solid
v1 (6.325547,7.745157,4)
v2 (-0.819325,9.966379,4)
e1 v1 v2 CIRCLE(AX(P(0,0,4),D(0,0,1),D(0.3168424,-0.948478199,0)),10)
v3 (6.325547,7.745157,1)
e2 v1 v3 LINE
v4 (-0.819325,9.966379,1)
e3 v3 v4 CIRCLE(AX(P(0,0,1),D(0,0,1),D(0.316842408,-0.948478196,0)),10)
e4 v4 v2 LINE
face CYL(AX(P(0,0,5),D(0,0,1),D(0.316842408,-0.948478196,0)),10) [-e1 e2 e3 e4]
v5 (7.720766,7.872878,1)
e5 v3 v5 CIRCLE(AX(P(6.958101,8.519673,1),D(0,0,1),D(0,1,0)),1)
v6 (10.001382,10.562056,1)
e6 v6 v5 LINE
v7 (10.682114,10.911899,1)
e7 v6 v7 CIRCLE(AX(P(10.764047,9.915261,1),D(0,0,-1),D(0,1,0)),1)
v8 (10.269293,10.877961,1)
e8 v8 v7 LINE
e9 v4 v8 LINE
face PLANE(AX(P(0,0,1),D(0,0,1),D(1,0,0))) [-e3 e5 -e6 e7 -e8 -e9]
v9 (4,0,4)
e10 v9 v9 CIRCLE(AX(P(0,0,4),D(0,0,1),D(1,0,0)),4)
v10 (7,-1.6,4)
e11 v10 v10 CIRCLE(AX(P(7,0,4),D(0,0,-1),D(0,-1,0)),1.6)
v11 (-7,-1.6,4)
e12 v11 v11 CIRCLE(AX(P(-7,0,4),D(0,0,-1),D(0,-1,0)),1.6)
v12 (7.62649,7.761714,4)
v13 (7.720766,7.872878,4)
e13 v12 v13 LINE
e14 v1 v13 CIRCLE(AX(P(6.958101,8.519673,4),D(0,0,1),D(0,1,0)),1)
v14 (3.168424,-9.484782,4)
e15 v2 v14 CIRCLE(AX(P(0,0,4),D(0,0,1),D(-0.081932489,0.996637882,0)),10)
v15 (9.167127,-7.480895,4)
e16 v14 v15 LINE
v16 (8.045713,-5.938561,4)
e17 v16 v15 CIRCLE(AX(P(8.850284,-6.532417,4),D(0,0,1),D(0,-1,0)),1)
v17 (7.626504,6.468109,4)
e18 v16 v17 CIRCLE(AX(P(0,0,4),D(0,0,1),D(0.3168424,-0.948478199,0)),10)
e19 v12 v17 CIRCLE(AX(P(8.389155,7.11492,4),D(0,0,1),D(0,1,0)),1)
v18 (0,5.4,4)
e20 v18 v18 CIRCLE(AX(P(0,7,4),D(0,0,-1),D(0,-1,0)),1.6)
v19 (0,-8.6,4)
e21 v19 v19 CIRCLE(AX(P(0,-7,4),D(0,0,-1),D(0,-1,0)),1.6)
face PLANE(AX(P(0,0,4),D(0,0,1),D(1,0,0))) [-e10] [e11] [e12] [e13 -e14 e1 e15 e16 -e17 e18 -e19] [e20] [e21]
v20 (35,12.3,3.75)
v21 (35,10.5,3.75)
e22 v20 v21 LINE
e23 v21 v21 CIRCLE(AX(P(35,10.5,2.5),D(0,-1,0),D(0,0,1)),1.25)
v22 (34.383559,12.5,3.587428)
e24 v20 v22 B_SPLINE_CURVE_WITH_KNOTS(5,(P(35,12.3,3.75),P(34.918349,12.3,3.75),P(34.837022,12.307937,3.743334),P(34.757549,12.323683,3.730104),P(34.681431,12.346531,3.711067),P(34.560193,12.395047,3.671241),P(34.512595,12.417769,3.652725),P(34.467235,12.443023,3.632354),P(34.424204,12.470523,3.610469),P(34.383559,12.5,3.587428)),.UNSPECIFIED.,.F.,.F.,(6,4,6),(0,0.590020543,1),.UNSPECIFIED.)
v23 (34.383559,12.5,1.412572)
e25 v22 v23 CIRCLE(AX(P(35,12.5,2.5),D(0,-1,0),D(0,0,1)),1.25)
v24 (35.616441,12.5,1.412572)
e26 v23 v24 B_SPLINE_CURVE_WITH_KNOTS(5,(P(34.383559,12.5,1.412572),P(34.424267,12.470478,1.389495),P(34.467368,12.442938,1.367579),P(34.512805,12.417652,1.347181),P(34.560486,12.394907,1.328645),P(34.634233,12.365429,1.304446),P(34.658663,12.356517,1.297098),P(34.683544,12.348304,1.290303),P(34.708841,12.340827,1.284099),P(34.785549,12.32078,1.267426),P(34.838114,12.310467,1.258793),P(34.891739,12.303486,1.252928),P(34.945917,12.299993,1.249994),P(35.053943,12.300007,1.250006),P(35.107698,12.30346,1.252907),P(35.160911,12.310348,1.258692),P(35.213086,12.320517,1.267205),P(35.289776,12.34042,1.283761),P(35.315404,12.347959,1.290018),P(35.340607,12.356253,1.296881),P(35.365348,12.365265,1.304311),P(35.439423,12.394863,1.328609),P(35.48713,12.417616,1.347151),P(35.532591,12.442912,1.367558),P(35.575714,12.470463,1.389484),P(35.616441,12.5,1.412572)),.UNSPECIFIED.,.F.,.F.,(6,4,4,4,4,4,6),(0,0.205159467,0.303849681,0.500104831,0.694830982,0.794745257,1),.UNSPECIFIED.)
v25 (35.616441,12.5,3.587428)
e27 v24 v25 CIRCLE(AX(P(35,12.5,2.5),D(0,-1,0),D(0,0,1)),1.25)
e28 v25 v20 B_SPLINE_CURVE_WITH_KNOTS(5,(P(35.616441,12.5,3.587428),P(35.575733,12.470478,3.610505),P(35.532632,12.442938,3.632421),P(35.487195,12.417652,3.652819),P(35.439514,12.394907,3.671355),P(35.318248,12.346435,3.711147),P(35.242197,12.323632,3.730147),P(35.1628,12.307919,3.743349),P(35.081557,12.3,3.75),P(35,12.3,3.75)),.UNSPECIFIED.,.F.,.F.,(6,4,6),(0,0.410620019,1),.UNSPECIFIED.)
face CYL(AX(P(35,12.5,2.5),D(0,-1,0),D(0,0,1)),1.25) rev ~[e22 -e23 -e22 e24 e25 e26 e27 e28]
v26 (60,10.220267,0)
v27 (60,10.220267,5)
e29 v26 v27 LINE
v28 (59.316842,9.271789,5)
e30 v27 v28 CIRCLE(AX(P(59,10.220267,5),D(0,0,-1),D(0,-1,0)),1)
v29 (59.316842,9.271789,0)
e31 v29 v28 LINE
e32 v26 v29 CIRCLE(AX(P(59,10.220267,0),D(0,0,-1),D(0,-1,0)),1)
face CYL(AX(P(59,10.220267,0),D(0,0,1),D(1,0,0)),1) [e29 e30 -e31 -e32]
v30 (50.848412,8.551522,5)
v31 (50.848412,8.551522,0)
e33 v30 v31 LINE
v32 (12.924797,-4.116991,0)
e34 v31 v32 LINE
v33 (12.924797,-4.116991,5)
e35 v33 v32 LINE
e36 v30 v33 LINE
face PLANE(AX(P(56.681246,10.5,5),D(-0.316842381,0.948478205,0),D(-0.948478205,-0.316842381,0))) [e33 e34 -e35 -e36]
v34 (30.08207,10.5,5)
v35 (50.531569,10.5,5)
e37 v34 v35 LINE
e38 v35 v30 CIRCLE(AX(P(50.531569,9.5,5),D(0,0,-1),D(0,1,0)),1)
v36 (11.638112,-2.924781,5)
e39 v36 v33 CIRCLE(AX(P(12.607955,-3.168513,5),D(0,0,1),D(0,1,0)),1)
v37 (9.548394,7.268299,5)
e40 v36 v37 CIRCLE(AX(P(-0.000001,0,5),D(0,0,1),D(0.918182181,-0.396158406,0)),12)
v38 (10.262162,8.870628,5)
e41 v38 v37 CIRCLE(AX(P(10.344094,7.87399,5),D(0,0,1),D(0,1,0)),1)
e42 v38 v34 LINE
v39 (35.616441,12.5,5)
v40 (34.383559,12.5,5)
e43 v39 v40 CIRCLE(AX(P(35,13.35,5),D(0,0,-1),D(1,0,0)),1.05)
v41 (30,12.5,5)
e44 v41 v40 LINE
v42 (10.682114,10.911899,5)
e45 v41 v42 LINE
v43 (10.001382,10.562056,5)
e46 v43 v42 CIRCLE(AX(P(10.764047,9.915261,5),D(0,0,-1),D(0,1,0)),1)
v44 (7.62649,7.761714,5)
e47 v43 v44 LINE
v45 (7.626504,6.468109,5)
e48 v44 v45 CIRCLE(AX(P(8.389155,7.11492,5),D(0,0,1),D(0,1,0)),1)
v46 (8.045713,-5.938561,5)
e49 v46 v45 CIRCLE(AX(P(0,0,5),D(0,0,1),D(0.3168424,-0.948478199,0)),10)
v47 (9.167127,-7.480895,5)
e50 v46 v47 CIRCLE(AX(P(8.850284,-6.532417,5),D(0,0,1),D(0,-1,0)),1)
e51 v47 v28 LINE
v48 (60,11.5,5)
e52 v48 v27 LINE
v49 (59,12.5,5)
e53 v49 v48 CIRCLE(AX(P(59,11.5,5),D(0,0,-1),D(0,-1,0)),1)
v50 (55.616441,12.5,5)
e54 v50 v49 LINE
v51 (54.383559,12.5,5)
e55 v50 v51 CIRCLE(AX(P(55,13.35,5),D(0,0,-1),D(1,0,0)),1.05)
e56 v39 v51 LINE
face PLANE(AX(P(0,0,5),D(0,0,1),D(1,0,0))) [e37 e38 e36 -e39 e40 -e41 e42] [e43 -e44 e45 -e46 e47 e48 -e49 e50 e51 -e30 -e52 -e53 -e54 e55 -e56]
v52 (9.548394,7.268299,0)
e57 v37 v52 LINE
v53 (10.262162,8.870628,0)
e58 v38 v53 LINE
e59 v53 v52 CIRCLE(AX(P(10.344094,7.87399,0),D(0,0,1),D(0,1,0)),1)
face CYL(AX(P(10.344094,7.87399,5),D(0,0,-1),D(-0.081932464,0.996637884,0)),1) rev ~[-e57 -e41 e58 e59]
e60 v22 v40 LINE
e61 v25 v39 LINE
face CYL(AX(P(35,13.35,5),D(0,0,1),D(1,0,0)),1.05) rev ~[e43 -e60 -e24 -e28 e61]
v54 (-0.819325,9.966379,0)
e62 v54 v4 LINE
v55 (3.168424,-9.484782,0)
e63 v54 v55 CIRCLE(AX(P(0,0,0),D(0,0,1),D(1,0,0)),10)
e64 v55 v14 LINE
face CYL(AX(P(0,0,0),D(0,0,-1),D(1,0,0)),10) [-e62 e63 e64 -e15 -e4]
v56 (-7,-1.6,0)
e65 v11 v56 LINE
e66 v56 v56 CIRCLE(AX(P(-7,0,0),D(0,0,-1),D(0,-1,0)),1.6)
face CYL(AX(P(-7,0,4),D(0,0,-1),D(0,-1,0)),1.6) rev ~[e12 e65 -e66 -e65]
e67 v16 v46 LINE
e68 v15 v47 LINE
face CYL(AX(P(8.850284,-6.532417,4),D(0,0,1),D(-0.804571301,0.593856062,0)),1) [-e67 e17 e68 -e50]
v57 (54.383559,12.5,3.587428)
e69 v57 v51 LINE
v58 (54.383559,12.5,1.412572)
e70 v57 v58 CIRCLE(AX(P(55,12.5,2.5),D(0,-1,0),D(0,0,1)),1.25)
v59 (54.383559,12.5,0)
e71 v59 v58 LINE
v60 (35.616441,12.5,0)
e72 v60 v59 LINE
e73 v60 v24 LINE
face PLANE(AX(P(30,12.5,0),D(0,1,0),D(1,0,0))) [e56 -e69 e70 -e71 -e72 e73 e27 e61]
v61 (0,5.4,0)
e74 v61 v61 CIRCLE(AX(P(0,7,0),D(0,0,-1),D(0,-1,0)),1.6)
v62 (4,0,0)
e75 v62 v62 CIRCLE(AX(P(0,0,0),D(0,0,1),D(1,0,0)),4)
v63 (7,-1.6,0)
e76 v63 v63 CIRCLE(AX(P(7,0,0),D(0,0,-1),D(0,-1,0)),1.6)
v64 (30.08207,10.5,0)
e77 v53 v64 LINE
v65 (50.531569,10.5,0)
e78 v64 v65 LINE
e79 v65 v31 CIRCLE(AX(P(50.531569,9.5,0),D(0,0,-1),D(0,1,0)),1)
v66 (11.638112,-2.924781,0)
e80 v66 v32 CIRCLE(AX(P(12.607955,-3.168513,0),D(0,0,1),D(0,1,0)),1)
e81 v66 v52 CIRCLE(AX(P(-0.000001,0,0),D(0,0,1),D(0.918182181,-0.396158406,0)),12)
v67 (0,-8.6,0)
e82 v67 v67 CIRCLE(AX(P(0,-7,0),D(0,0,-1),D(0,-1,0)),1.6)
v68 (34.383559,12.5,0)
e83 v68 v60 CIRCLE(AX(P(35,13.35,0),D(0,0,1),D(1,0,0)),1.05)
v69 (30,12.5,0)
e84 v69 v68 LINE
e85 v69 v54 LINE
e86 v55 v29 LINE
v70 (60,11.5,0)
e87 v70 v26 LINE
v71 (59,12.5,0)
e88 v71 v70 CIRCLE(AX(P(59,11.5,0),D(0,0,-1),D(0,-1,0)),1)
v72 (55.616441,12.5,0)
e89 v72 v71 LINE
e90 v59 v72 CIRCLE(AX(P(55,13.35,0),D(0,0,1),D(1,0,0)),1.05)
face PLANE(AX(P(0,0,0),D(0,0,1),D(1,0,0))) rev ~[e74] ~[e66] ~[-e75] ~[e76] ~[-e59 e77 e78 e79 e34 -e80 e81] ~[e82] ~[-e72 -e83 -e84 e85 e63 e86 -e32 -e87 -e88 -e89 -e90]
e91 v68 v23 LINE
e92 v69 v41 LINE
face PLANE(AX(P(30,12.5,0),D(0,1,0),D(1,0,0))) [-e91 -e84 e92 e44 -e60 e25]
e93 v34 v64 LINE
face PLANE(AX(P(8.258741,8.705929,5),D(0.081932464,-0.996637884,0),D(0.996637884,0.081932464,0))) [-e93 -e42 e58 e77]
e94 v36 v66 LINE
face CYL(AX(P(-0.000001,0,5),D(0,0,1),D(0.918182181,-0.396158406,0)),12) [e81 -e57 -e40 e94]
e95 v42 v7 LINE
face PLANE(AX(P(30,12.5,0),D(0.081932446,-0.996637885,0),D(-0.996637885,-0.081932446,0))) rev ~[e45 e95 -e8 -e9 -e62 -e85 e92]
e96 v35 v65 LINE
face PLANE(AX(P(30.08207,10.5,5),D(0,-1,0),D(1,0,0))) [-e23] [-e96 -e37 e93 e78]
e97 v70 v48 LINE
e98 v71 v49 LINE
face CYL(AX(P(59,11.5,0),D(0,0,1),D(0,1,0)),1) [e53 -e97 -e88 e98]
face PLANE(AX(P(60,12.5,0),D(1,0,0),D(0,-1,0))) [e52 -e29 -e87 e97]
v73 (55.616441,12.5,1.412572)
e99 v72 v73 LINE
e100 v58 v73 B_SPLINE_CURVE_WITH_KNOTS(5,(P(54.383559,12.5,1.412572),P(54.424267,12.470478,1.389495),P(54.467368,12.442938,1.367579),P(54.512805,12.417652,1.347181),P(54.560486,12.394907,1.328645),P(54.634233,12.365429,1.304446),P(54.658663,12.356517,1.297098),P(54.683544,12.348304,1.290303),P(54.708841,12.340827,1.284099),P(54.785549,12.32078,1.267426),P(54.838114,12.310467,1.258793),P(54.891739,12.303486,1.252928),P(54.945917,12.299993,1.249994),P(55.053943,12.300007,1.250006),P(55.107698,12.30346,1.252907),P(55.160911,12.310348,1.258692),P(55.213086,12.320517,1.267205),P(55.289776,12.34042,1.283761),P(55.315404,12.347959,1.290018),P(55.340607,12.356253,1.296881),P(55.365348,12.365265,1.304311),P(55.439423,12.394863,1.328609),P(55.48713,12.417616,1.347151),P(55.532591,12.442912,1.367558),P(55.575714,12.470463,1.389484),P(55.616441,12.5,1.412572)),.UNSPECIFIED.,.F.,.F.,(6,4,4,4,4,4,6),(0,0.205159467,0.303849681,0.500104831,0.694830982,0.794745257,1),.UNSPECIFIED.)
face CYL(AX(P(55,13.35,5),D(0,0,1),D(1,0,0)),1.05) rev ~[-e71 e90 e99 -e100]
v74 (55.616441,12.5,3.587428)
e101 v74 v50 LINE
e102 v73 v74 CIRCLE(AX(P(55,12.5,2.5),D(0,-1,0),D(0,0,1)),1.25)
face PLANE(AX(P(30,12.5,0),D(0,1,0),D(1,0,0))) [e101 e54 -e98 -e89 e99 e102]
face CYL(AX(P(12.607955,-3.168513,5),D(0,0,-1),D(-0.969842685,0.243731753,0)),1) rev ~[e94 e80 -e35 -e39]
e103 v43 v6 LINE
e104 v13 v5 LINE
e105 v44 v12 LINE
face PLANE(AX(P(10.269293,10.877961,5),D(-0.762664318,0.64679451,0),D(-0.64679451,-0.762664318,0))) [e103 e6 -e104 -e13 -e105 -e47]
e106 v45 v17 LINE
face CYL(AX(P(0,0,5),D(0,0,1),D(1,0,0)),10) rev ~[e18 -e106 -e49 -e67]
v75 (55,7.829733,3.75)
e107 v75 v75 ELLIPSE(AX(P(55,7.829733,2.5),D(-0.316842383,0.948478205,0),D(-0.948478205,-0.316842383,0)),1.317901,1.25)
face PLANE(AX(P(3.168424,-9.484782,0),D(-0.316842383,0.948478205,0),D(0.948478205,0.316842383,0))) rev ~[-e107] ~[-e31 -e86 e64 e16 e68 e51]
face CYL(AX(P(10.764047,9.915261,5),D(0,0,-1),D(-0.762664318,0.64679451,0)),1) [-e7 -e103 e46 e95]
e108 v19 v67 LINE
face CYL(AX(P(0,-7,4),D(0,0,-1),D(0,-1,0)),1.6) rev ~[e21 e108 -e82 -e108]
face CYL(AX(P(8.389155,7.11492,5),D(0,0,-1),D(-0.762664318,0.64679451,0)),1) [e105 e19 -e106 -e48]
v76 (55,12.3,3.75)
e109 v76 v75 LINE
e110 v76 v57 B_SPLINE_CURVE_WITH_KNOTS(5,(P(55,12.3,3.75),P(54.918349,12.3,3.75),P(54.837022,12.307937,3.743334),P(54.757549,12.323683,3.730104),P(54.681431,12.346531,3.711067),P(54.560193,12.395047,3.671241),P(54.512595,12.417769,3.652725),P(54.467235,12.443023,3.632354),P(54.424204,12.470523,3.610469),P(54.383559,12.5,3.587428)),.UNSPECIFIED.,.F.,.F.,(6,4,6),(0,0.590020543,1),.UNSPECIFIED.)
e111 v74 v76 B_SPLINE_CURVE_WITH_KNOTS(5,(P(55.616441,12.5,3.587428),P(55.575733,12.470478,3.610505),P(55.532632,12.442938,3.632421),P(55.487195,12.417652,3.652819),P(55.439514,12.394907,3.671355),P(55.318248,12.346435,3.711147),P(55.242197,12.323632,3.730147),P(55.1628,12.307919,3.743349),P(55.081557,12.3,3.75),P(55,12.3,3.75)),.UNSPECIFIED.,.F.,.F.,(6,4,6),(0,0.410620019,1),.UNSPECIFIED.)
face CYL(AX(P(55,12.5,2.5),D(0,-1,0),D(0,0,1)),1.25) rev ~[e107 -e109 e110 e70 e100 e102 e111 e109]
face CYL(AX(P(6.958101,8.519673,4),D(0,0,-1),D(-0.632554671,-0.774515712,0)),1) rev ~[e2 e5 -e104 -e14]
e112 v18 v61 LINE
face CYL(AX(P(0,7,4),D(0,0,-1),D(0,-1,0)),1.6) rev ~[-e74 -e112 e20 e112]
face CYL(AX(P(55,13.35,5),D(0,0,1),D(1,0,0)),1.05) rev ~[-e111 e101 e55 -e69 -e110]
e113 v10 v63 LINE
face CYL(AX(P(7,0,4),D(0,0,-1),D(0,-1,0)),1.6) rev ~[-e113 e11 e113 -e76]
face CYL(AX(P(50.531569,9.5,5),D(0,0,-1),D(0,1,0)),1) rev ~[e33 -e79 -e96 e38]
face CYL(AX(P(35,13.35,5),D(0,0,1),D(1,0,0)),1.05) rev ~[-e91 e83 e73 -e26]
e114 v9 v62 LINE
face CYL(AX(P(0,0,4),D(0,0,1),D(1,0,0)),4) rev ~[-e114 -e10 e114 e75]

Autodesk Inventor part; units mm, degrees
ref_plane "YZ Plane" through (0, 0, 0) normal (1, 0, 0) x (0, 1, 0)
ref_plane "XZ Plane" through (0, 0, 0) normal (0, 1, 0) x (-1, 0, 0)
ref_plane "XY Plane" through (0, 0, 0) normal (0, 0, 1) x (1, 0, 0)
sketch "スケッチ1" plane through (0, 0, 0) normal (0, 0, 1) x (1, 0, 0)
  circle A0 centre (0, 0) radius 10
  line L0 (30, 12.5) -> (60, 12.5)
  line L1 (60, 12.5) -> (60, 9.5)
  line L2 (60, 9.5) -> (30, 9.5)
  line L3 (30, 9.5) -> (30, 12.5)
  line L4 (30, 12.5) -> (-0.819325, 9.966379)
  line L5 (3.168424, -9.484782) -> (60, 9.5)
  dimension "d0" = 20
  dimension "d1" = 30
  dimension "d2" = 3
  dimension "d3" = 12.5
  dimension "d4" = 60
extrude "プレート1" add sketch "スケッチ1" along normal blind 5
sketch "スケッチ2" plane through (0, 0, 5) normal (0, 0, 1) x (1, 0, 0)
  arc A0 (-0.819325, 9.966379) -> (3.168424, -9.484782) centre (0, 0) ccw
  line L0 (30, 12.5) -> (-0.819325, 9.966379)
  circle A1 centre (0, 0) radius 10
  point P0 (3.168424, -9.484782)
extrude "押し出し1" cut sketch "スケッチ2" against normal blind 1
sketch "スケッチ3" plane through (0, 0, 4) normal (0, 0, 1) x (1, 0, 0)
  circle A0 centre (0, 0) radius 7 construction
  line L0 (0, -7) -> (7, 0) construction
  line L1 (7, 0) -> (0, 7) construction
  line L2 (0, 7) -> (-7, 0) construction
  line L3 (-7, 0) -> (0, -7) construction
  line L4 (0, -7) -> (0, 7) construction
  line L5 (7, 0) -> (-7, 0) construction
  dimension "d8" = 14
hole "穴1" at (0, 7, 4) at (7, 0, 4) at (0, -7, 4) at (-7, 0, 4) direction (0, 0, -1) diameter 3.2 end through all
sketch "スケッチ4" plane through (0, 0, 4) normal (0, 0, 1) x (1, 0, 0)
  circle A0 centre (0, 0) radius 4
  dimension "d16" = 8
extrude "押し出し2" cut sketch "スケッチ4" against normal through all
sketch "スケッチ6" plane through (0, 0, 5) normal (0, 0, 1) x (1, 0, 0)
  line L0 (60, 9.5) -> (3.168424, -9.484782)
  line L1 (60, 12.5) -> (60, 9.5)
  line L2 (30, 12.5) -> (60, 12.5)
  line L3 (-0.819325, 9.966379) -> (30, 12.5)
  arc A0 (3.168424, -9.484782) -> (-0.819325, 9.966379) centre (0, 0) ccw
  line L4 (30.08207, 10.5) -> (56.681246, 10.5)
  line L5 (56.681246, 10.5) -> (11.018186, -4.753901)
  arc A1 (11.018186, -4.753901) -> (8.258741, 8.705929) centre (0, 0) ccw
  line L6 (8.258741, 8.705929) -> (30.08207, 10.5)
  dimension "d28" = 2
extrude "押し出し4" cut sketch "スケッチ6" against normal through all contours L4 L5 A1 L6
sketch "スケッチ5" plane through (0, 0, 5) normal (0, 0, 1) x (1, 0, 0)
  line L0 (30, 12.5) -> (60, 12.5) projected
  circle A0 centre (35, 13.35) radius 1.05
  circle A1 centre (55, 13.35) radius 1.05
  line L1 (60, 12.5) -> (60, 9.5) projected
  point P0 (0, 0)
  dimension "d20" = 2.1
  dimension "d21" = 2.1
  dimension "d22" = 5
  dimension "d23" = 5
  dimension "d24" = 0.85
  dimension "d25" = 0.85
extrude "押し出し3" cut sketch "スケッチ5" against normal through all
fillet "フィレット2" radius 1 4 edges at (11.0182, -4.7539, 2.5) (8.2587, 8.7059, 2.5) (56.6812, 10.5, 2.5) (30.0821, 10.5, 2.5)
sketch "スケッチ7" plane through (35.616441, 12.5, 0) normal (0, 1, 0) x (1, 0, 0)
  line L0 (18.767117, -5) -> (18.767117, 0)
  line L1 (20, -5) -> (18.767117, -5)
  line L2 (20, 0) -> (20, -5)
  line L3 (18.767117, 0) -> (20, 0)
  line L4 (-1.232883, -5) -> (-1.232883, 0)
  line L5 (0, -5) -> (-1.232883, -5)
  line L6 (0, 0) -> (0, -5)
  line L7 (-1.232883, 0) -> (0, 0)
  point P0 (-35.616441, 0)
  point P1 (-0.616441, -2.5)
  point P2 (19.383559, -2.5)
  point P3 (19.383559, -5)
  point P4 (-0.616441, -5)
  point P5 (-1.232883, -2.5)
  point P6 (18.767117, -2.5)
hole "穴2" at (35, 12.5, 2.5) at (55, 12.5, 2.5) direction (0, -1, 0) diameter 2.5 depth 8 tip angle 118
fillet "フィレット3" radius 1 3 edges at (60, 9.5, 2.5) (60, 12.5, 2.5) (30, 12.5, 2.5)
sketch "スケッチ8" plane through (0, 0, 5) normal (0, 0, 1) x (1, 0, 0)
  arc A0 (3.168424, -9.484782) -> (-0.819325, 9.966379) centre (0, 0) ccw
  line L0 (-0.819325, 9.966379) -> (29.959103, 12.496638)
  line L1 (10.269293, 10.877961) -> (7.054657, 7.08744)
  arc A1 (10.262161, 8.870628) -> (9.548394, 7.268299) centre (10.344094, 7.87399) ccw
  dimension "d40" = 2
  dimension "d41" = 45
extrude "押し出し5" cut sketch "スケッチ8" against normal blind 4
fillet "フィレット4" radius 1 4 edges at (7.0547, 7.0874, 2.5) (7.0547, 7.0874, 4.5) (10.2693, 10.878, 3) (3.1684, -9.4848, 4.5)
equation "\"d14\" = Thickness"
equation "\"d23\" = d22"
equation "\"d25\" = d24"
equation "\"d5\" = Thickness"
equation "\"BendRadius\" = Thickness"
equation "\"BendReliefWidth\" = Thickness"
equation "\"BendReliefDepth\" = 0.5 * Thickness"
equation "\"TransitionRadius\" = BendRadius"
equation "\"JacobiRadiusSize\" = BendRadius"
equation "\"GapSize\" = Thickness"
equation "\"Thickness\" = 5"
properties part number "T5.0_club-face"
